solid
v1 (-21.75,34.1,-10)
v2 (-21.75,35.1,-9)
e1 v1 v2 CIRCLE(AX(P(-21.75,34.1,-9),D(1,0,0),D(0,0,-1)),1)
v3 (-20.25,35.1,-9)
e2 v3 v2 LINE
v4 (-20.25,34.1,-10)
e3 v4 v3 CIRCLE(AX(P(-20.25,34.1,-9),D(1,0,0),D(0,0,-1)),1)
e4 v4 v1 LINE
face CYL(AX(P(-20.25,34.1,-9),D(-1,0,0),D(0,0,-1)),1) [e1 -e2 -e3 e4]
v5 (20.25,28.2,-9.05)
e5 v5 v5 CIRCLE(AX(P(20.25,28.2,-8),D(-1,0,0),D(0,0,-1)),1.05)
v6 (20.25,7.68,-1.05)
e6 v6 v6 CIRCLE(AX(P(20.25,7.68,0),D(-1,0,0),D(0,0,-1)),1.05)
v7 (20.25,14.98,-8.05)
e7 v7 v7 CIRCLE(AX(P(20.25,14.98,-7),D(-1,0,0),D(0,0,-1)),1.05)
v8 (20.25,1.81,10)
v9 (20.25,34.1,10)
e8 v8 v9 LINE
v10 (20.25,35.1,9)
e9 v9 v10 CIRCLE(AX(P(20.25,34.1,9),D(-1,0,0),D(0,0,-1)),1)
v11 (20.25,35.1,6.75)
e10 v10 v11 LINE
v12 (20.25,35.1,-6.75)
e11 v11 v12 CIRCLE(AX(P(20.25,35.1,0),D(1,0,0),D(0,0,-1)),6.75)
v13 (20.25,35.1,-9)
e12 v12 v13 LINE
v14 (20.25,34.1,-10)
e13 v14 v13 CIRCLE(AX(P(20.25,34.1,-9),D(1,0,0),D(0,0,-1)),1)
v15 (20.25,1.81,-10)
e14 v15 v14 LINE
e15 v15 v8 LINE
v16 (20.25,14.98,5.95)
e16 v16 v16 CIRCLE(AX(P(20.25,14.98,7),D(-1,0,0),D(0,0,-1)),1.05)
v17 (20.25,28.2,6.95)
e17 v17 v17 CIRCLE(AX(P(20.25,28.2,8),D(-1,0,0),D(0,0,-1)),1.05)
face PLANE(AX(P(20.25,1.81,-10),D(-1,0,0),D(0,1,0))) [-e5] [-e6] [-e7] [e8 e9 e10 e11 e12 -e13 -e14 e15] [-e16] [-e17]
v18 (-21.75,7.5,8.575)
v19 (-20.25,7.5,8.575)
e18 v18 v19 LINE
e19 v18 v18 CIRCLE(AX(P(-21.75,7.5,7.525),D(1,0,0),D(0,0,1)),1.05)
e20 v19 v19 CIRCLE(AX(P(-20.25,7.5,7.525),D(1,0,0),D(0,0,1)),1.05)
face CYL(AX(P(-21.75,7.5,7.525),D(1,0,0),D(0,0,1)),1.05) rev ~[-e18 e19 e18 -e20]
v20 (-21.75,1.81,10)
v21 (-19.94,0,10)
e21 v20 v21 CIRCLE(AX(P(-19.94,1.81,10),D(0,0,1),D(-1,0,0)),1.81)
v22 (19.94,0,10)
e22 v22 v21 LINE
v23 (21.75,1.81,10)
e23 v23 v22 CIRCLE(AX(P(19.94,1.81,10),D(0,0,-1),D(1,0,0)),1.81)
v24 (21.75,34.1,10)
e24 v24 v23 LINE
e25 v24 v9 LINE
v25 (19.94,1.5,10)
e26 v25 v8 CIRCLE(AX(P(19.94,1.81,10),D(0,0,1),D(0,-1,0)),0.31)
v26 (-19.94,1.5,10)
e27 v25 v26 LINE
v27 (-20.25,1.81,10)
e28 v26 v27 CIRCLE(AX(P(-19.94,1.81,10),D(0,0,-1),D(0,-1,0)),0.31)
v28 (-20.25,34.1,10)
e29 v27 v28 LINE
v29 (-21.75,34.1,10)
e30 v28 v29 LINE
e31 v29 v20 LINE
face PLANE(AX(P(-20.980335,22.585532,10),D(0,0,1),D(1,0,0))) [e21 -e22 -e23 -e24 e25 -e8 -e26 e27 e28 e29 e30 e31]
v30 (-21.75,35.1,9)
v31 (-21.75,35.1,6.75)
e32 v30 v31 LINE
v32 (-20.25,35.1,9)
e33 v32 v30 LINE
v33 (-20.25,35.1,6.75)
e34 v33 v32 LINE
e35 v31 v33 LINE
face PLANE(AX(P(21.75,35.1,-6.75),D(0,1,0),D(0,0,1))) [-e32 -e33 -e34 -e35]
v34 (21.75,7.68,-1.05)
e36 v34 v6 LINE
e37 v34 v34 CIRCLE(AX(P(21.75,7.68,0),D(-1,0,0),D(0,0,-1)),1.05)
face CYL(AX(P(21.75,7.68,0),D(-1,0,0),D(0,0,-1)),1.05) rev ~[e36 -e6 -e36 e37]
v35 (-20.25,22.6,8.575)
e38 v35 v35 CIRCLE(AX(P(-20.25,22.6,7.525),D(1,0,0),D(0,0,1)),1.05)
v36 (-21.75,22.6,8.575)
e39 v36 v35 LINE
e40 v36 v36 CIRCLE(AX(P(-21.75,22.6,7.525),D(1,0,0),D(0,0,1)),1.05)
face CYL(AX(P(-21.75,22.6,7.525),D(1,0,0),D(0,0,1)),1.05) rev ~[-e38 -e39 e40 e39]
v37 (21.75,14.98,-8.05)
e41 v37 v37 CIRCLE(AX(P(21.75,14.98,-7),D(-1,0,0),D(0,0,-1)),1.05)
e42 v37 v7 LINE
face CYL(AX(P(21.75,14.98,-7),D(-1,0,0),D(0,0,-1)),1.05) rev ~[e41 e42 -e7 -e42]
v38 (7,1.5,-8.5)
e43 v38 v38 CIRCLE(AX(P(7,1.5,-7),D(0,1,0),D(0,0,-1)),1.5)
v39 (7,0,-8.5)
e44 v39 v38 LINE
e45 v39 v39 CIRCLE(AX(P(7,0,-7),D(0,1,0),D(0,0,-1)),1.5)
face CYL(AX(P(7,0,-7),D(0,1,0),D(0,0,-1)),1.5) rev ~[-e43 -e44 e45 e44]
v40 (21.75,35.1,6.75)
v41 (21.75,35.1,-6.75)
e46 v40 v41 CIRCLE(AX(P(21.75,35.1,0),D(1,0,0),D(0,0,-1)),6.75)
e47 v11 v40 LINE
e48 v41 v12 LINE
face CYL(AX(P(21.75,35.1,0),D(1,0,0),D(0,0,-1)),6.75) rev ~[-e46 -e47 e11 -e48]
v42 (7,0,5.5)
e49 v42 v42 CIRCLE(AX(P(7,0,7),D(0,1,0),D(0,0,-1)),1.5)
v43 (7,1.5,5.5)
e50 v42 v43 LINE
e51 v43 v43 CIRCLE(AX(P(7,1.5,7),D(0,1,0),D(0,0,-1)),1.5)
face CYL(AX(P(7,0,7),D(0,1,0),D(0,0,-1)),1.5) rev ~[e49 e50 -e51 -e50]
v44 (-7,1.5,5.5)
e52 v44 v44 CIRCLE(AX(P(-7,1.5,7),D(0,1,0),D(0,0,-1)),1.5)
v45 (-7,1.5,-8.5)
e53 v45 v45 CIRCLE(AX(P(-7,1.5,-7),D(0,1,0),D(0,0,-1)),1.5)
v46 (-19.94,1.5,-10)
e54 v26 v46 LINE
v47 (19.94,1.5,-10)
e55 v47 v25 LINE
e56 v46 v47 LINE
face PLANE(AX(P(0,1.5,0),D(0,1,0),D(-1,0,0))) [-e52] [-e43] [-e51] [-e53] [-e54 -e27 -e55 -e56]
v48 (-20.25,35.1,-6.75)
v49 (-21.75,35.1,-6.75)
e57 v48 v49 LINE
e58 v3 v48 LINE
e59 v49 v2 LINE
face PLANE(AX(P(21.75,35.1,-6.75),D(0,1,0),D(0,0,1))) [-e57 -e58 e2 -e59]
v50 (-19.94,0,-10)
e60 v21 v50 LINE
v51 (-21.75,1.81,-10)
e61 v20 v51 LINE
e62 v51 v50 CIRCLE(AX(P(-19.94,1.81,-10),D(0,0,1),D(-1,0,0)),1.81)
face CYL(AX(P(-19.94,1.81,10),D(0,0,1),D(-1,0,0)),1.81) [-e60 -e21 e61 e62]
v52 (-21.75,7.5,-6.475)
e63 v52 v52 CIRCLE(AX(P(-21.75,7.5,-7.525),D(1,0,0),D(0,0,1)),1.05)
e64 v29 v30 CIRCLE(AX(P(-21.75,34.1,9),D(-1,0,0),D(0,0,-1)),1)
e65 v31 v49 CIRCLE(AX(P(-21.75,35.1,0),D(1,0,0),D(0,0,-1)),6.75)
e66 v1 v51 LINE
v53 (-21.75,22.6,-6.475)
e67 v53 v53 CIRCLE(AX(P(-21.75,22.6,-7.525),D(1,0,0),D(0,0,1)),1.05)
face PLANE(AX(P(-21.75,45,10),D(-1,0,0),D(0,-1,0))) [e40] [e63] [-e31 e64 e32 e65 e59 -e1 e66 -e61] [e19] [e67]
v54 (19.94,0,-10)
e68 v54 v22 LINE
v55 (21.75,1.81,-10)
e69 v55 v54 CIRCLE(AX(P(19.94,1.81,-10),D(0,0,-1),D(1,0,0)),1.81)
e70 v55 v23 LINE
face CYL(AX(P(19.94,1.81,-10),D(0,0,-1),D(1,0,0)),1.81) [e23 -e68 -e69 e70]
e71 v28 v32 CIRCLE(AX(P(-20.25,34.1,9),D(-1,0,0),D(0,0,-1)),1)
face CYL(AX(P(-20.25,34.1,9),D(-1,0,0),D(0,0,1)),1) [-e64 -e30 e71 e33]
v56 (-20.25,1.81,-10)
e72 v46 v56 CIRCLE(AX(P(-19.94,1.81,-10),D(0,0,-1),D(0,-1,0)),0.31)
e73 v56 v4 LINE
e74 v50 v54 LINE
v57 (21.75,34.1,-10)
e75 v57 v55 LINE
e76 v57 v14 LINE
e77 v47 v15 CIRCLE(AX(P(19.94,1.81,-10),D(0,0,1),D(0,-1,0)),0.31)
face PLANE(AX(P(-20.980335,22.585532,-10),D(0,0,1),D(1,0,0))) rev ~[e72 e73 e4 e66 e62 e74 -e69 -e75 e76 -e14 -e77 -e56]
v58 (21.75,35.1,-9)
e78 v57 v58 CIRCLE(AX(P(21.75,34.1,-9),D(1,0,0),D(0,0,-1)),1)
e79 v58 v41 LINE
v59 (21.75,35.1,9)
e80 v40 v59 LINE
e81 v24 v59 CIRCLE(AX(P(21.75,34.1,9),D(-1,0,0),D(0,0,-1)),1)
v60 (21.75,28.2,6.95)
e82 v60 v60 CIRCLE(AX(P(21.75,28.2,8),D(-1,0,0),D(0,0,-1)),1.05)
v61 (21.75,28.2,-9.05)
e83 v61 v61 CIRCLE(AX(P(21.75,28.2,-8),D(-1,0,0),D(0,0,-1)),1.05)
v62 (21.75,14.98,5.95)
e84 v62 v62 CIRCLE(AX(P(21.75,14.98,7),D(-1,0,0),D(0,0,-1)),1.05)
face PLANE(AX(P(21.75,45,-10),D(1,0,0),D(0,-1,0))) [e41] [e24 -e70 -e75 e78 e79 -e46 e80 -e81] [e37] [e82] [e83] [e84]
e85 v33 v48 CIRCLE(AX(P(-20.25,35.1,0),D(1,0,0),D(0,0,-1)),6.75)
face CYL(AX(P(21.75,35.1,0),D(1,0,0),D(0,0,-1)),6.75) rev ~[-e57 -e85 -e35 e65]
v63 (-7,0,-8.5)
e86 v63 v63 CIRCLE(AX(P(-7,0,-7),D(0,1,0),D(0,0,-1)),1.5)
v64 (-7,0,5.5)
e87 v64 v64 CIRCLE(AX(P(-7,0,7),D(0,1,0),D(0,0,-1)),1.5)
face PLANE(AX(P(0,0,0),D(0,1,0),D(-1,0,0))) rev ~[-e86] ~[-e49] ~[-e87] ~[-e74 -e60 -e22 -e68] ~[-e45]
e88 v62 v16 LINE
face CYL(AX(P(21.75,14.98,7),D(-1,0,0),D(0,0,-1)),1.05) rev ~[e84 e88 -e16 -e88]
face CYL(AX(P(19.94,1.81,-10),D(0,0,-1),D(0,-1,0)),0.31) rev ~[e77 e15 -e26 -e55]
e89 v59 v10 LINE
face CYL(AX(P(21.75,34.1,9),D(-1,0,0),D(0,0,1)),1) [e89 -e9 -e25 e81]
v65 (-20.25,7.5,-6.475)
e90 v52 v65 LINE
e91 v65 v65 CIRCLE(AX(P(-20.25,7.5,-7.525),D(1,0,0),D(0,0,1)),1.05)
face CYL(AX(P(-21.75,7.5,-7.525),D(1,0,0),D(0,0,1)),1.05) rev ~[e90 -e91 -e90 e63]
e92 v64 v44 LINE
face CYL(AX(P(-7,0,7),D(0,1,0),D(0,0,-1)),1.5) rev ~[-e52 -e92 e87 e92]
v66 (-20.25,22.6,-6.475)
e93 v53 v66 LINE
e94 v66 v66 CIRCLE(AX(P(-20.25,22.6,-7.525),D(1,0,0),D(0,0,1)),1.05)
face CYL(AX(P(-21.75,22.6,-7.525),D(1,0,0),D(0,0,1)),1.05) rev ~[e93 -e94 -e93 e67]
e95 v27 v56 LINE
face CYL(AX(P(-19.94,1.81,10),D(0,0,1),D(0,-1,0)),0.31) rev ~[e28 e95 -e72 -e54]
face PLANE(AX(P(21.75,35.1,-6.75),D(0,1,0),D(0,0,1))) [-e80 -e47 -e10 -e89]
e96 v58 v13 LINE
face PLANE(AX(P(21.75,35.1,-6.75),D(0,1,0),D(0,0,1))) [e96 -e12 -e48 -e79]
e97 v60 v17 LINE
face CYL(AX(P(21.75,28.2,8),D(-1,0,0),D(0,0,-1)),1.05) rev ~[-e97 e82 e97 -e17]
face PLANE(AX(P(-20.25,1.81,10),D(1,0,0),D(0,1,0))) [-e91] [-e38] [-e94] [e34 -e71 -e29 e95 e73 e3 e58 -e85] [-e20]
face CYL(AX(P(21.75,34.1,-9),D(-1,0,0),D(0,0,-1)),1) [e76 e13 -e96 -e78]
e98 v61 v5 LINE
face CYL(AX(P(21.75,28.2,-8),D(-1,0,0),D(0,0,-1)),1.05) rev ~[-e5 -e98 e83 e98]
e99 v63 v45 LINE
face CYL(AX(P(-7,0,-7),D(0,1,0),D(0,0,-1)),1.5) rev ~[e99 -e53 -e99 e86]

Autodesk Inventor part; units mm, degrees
ref_plane "YZ Plane" through (0, 0, 0) normal (1, 0, 0) x (0, 1, 0)
ref_plane "XZ Plane" through (0, 0, 0) normal (0, 1, 0) x (-1, 0, 0)
ref_plane "XY Plane" through (0, 0, 0) normal (0, 0, 1) x (1, 0, 0)
sketch "Sketch1" plane through (0, 0, 0) normal (0, 1, 0) x (-1, 0, 0)
  line L0 (20.25, -10) -> (-20.25, -10)
  line L1 (-20.25, -10) -> (-20.25, 10)
  line L2 (-20.25, 10) -> (20.25, 10)
  line L3 (20.25, 10) -> (20.25, -10)
  point P0 (0, 0)
  dimension "d0" = 40.5
  dimension "d1" = 20
  dimension "d2" = 10
  dimension "d3" = 20.25
extrude "Plate1" add sketch "Sketch1" along normal blind 1.5
sketch "Sketch2" plane through (21.75, 0, -10) normal (-1, 0, 0) x (0, -1, 0)
  line L0 (0, 20) -> (0, 0)
  line L1 (0, 0) -> (-45, 0)
  line L2 (-45, 0) -> (-45, 20)
  line L3 (-45, 20) -> (0, 20)
edge flange "Flange1" height 45 angle 90 thickness 1.5 bend radius 0.31 thickness toward (-1, 0, 0) relief tear relief width 1.5 relief depth 0.75 edges at (20.25, 1.5, 0) wall of the first edge with corners at (21.75, 0, 10) (21.75, 0, -10) (21.75, 45, -10) (21.75, 45, 10)
bend "Bend1"
corner "Corner1"
sketch "Sketch3" plane through (-21.75, 0, 10) normal (1, 0, 0) x (0, 1, 0)
  line L0 (0, -20) -> (0, 0)
  line L1 (0, 0) -> (45, 0)
  line L2 (45, 0) -> (45, -20)
  line L3 (45, -20) -> (0, -20)
edge flange "Flange2" height 45 angle 90 thickness 1.5 bend radius 0.31 thickness toward (1, 0, 0) relief tear relief width 1.5 relief depth 0.75 edges at (-20.25, 1.5, 0) wall of the first edge with corners at (-21.75, 0, -10) (-21.75, 0, 10) (-21.75, 45, 10) (-21.75, 45, -10)
bend "Bend2"
corner "Corner2"
sketch "Sketch4" plane through (21.75, 45, 10) normal (1, 0, 0) x (0, 0, -1)
  circle A0 centre (10, -9.9) radius 6.75
  line L0 (0, 0) -> (20, 0) projected
  line L1 (20, 0) -> (20, -43.19) projected
  point P0 (10, -45)
  dimension "d25" = 9.9
  dimension "d26" = 13.5
  dimension "d27" = 10
extrude "Extrusion1" cut sketch "Sketch4" against normal blind 50
sketch "Sketch5" plane through (21.75, 45, 10) normal (1, 0, 0) x (0, 0, -1)
  circle A0 centre (10, -9.9) radius 6.75 projected
  line L0 (0, 0) -> (20, 0) projected
  line L1 (-4, 0) -> (24, 0)
  line L2 (24, 0) -> (24, -9.9)
  line L3 (24, -9.9) -> (-4, -9.9)
  line L4 (-4, -9.9) -> (-4, 0)
  line L5 (0, -43.19) -> (0, 0) projected
  point P0 (10, -45)
  dimension "d30" = 9.9
  dimension "d31" = 28
  dimension "d32" = 4
extrude "Extrusion2" cut sketch "Sketch5" against normal blind 50 contours L3 A0 | A0 L3 L5 L0 L1 L2 | L3 L4 L1 L5 picked at (11.6841, -8.408)
fillet "Fillet1" radius 1 4 edges at (-21, 35.1, 10) (-21, 35.1, -10) (21, 35.1, -10) (21, 35.1, 10)
sketch "Sketch8" plane through (0, 0, 0) normal (0, -1, 0) x (1, 0, 0)
  circle A0 centre (8, -8) radius 1.05 projected
  circle A1 centre (-8, -8) radius 1.05 projected
  circle A2 centre (8, 8) radius 1.05 projected
  circle A3 centre (-8, 8) radius 1.05 projected
  circle A4 centre (-7, -7) radius 1.5
  line L0 (-9.33, -10.07) -> (7.53, -10.07)
  line L1 (10.07, -8.5) -> (10.07, 29.6)
  circle A5 centre (7, -7) radius 1.5
  circle A6 centre (-7, 7) radius 1.5
  circle A7 centre (7, 7) radius 1.5
  point P0 (0, 0)
  dimension "d71" = 7
  dimension "d72" = 7
  dimension "d73" = 3
  dimension "d76" = 14
  dimension "d79" = 14
hole "Hole3" at (-7, 0, -7) at (-7, 0, 7) at (7, 0, 7) at (7, 0, -7) direction (0, 1, 0) diameter 3 depth 1.5
sketch "Sketch9" plane through (-21.75, 1.81, -10) normal (-1, 0, 0) x (0, 0, 1)
  circle A0 centre (17.525, 20.79) radius 0.7835 projected
  circle A1 centre (17.525, 5.69) radius 0.7835 projected
  circle A2 centre (2.475, 20.79) radius 0.7835 projected
  circle A3 centre (2.475, 5.69) radius 0.7835 projected
  point P0 (10, -1.81)
hole "Hole4" at (-21.75, 7.5, 7.525) at (-21.75, 7.5, -7.525) at (-21.75, 22.6, -7.525) at (-21.75, 22.6, 7.525) direction (1, 0, 0) diameter 2.1 depth 1.5
sketch "Sketch10" plane through (21.75, 1.81, 10) normal (1, 0, 0) x (0, 0, -1)
  circle A0 centre (3, 13.17) radius 0.7835 projected
  circle A1 centre (10, 5.87) radius 0.7835 projected
  circle A2 centre (17, 13.17) radius 0.7835 projected
  circle A3 centre (2, 26.39) radius 0.7835 projected
  circle A4 centre (18, 26.39) radius 0.7835 projected
  point P0 (10, -1.81)
hole "Hole5" at (21.75, 28.2, 8) at (21.75, 28.2, -8) at (21.75, 14.98, -7) at (21.75, 7.68, 0) at (21.75, 14.98, 7) direction (-1, 0, 0) diameter 2.1 depth 1.5
equation "\"d55\" = Thickness"
equation "\"d62\" = Thickness"
equation "\"d69\" = Thickness"
equation "\"d4\" = Thickness"
equation "\"d5\" = BendReliefWidth"
equation "\"d6\" = BendReliefDepth"
equation "\"d7\" = MinimumRemnant"
equation "\"d8\" = TransitionRadius"
equation "\"d11\" = BendRadius"
equation "\"d12\" = CornerReliefSize"
equation "\"d13\" = GapSize"
equation "\"d14\" = JacobiRadiusSize"
equation "\"d15\" = BendReliefWidth"
equation "\"d16\" = BendReliefDepth"
equation "\"d17\" = MinimumRemnant"
equation "\"d18\" = TransitionRadius"
equation "\"d21\" = BendRadius"
equation "\"d22\" = CornerReliefSize"
equation "\"d23\" = GapSize"
equation "\"d24\" = JacobiRadiusSize"
equation "\"BendReliefWidth\" = Thickness"
equation "\"BendReliefDepth\" = 0.5 * Thickness"
equation "\"CornerReliefSize\" = 4 * Thickness"
equation "\"MinimumRemnant\" = 2 * Thickness"
equation "\"TransitionRadius\" = BendRadius"
equation "\"JacobiRadiusSize\" = BendRadius"
equation "\"GapSize\" = Thickness"
equation "\"Thickness\" = 1.5"
equation "\"BendRadius\" = 0.31"
properties part number "axis_10_top_frame" material "Aluminum 6061-AHC"
